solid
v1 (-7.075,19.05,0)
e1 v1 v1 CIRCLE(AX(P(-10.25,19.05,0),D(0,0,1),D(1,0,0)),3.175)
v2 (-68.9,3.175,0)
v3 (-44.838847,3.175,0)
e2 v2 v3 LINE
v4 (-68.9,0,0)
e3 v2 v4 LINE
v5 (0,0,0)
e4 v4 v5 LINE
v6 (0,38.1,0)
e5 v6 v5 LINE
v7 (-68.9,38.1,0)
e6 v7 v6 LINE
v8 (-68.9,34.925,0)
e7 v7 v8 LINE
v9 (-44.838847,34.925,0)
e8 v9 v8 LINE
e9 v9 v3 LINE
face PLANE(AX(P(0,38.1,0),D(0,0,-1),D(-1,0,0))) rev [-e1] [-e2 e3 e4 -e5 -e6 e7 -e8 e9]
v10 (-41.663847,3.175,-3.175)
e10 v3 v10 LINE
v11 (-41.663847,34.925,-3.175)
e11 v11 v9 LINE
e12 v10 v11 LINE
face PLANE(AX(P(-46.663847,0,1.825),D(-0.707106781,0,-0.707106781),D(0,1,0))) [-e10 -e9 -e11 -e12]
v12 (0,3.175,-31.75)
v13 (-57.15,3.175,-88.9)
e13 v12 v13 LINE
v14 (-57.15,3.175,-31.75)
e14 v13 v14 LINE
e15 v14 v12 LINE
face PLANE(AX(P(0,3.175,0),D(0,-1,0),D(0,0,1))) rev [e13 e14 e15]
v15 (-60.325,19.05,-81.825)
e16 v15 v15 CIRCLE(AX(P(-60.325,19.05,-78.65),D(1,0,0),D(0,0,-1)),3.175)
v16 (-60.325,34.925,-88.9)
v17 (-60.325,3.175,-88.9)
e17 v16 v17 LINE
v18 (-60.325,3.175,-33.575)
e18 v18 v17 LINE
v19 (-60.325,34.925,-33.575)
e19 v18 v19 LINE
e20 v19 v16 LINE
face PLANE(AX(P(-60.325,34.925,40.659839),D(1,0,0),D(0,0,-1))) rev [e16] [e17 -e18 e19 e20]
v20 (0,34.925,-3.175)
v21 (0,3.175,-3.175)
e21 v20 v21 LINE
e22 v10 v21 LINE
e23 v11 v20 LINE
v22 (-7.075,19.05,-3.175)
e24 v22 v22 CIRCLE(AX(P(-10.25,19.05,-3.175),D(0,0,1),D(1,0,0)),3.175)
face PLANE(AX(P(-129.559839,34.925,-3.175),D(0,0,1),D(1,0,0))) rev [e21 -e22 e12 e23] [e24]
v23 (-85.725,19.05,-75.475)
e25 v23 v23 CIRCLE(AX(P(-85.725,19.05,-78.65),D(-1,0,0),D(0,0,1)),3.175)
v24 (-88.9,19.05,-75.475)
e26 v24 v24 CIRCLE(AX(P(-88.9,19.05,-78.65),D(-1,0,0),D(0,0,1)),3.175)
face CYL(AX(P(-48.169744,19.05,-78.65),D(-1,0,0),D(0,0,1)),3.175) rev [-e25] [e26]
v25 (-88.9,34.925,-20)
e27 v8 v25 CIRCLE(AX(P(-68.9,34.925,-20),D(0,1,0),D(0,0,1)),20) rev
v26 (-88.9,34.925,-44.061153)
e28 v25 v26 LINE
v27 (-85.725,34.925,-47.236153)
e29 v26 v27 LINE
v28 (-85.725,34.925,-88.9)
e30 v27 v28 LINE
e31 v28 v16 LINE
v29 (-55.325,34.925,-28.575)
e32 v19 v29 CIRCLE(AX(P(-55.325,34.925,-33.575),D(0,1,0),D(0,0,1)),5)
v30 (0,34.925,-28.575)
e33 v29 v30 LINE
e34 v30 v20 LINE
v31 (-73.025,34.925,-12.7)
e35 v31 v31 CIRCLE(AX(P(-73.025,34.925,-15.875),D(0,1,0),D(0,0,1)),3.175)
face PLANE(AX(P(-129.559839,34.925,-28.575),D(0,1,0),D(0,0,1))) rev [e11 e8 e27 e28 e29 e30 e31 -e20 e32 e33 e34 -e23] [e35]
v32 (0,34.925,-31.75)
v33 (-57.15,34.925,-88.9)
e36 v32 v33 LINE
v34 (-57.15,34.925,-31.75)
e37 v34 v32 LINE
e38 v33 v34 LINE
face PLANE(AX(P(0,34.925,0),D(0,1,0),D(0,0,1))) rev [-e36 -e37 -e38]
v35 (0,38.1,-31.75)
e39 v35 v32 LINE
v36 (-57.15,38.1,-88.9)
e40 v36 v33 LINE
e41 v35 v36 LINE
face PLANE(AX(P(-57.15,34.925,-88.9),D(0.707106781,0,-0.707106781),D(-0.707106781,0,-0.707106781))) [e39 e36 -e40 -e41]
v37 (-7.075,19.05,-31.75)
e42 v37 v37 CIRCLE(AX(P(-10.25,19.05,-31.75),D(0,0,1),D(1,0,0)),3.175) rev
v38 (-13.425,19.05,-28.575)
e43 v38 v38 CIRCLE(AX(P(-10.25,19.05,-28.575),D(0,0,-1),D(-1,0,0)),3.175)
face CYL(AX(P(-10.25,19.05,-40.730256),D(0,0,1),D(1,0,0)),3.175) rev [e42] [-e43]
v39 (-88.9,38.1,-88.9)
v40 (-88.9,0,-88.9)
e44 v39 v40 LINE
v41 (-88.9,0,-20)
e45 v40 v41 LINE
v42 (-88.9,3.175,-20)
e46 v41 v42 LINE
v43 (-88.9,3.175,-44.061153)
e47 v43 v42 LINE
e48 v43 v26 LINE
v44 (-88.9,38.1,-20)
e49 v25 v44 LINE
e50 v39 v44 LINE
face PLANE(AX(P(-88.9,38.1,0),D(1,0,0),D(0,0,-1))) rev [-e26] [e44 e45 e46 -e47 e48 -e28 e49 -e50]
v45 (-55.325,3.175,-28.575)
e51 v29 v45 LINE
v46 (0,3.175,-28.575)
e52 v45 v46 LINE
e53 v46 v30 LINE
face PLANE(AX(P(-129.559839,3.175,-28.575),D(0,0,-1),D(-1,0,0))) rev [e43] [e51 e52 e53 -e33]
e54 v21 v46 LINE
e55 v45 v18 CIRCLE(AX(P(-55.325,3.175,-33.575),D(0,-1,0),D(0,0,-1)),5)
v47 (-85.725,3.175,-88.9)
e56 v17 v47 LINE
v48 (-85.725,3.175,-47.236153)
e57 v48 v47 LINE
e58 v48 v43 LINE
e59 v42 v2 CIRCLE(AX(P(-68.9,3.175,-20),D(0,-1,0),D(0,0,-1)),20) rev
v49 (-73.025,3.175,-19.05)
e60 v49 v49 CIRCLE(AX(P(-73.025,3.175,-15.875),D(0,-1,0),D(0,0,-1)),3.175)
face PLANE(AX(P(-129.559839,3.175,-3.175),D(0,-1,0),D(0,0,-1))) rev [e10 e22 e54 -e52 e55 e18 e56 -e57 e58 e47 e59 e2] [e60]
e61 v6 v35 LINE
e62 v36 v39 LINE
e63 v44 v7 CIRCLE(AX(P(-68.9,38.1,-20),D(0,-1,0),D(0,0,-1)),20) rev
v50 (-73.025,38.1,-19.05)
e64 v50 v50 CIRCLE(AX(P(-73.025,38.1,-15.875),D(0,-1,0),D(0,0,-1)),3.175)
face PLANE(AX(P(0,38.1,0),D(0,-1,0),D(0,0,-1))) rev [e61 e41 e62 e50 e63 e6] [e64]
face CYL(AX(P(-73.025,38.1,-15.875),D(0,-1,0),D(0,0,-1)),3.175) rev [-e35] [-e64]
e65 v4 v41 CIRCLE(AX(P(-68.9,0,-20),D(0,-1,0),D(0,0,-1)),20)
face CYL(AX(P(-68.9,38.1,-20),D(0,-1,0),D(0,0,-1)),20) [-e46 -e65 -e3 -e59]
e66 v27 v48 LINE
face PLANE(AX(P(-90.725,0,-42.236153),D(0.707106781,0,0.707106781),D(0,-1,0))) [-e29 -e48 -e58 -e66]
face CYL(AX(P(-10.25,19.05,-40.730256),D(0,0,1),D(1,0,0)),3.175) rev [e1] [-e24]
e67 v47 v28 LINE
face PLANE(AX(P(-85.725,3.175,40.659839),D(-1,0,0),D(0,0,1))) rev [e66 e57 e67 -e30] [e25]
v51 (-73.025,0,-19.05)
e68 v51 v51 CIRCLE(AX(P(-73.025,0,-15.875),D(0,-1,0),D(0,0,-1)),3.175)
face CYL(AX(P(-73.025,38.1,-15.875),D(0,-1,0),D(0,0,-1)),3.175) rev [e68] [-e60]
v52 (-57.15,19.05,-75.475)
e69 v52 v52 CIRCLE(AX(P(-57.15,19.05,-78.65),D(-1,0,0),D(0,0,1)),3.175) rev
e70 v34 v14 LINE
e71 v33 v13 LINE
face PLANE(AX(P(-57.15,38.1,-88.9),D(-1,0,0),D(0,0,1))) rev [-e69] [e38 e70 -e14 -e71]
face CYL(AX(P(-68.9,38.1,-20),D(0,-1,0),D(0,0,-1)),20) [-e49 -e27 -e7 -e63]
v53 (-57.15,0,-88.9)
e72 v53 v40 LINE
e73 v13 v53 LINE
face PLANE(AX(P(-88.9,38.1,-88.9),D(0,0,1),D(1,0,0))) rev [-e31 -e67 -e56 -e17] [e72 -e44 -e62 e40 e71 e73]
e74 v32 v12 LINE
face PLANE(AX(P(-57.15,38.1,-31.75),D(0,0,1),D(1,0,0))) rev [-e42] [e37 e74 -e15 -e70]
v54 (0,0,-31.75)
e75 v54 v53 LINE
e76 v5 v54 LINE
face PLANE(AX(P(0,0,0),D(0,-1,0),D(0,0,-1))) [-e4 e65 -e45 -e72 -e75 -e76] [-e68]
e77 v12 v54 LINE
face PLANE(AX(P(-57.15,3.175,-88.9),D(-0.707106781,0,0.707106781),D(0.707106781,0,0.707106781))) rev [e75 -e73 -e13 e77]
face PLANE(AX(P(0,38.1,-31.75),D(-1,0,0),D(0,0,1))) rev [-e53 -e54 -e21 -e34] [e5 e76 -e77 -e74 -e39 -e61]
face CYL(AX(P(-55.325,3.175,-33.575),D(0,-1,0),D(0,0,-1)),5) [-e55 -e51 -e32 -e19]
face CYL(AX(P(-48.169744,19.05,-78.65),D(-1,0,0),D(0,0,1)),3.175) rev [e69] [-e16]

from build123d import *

# Parameters (mm, degrees)
BOSS_EXTRUDE1_DEPTH     = 38.1
SKETCH2_W               = 25.4
SKETCH2_H               = 31.75
CUT_EXTRUDE1_DEPTH      = 88.9
CUT_EXTRUDE2_REACH      = 133.37
SKETCH3_W               = 25.4
SKETCH3_H               = 31.75
CUT_EXTRUDE3_START      = -62.861793
SKETCH4_W               = 75
SKETCH4_H               = 31.75
CUT_EXTRUDE3_DEPTH      = 28.575
FILLET4_R               = 20
CUT_EXTRUDE8_DEPTH      = 131.484388453
CUT_EXTRUDE8_DEPTH_BACK = 131.484388453
SKETCH8_R               = 3.175
BOSS_EXTRUDE2_DEPTH     = 3.175
CUT_EXTRUDE10_REACH     = 133.37
SKETCH35_R              = 3.175
CUT_EXTRUDE11_REACH     = 133.37
SKETCH36_R              = 3.175
FILLET8_R               = 5
CHAMFER1_SIZE           = 10
CHAMFER1_SIZE_2         = 7.071067812


with BuildPart() as part:
    # Sketch1 → Boss-Extrude1 (new body)
    with BuildSketch(Plane(origin=(0, 0, 0), x_dir=(1, 0, 0), z_dir=(0, 1, 0))):
        Polygon((0, 0), (-88.9, 0), (-88.9, 88.9), (-57.15, 88.9), (-57.15, 31.75), (0, 31.75), align=None)
    extrude(amount=BOSS_EXTRUDE1_DEPTH)

    # Sketch2 → Cut-Extrude1 (cut)
    with BuildSketch(Plane(origin=(0, 0, 0), x_dir=(0, 0, -1), z_dir=(1, 0, 0))):
        with Locations((15.875, 19.05)):
            Rectangle(SKETCH2_W, SKETCH2_H)
    extrude(amount=-CUT_EXTRUDE1_DEPTH, mode=Mode.SUBTRACT)

    # Cut-Extrude2: up to this face of the body (flat: up to its plane)
    cut_extrude2_end = Plane(part.part.faces().sort_by_distance((-44.45, 19.05, 0))[0])
    # Sketch3 → Cut-Extrude2 (cut, up to the picked face)
    with BuildSketch(Plane(origin=(0, 0, -88.9), x_dir=(-1, 0, 0), z_dir=(0, 0, -1)), mode=Mode.PRIVATE) as cut_extrude2_sk1:
        with Locations((73.025, 19.05)):
            Rectangle(SKETCH3_W, SKETCH3_H)
    cut_extrude2_tool1 = split(extrude(cut_extrude2_sk1.sketch, amount=-CUT_EXTRUDE2_REACH, mode=Mode.PRIVATE), bisect_by=cut_extrude2_end, keep=Keep.BOTH, mode=Mode.PRIVATE)
    add(cut_extrude2_tool1.solids().sort_by(Axis((-73.025, 19.05, -88.9), (0, 0, 1)))[0], mode=Mode.SUBTRACT)

    # Sketch4 → Cut-Extrude3 (cut)
    with BuildSketch(Plane(origin=(0, 0, 0), x_dir=(-0.7071067811865475, 0, -0.7071067811865476), z_dir=(0.7071067811865476, 0, -0.7071067811865475)).offset(CUT_EXTRUDE3_START)):
        with Locations((62.861792847, 19.05)):
            Rectangle(SKETCH4_W, SKETCH4_H)
    extrude(amount=CUT_EXTRUDE3_DEPTH, mode=Mode.SUBTRACT)

    # Fillet4
    fillet4_edges = [part.edges().sort_by_distance(p)[0] for p in [
        (-88.9, 36.5125, 0),
        (-88.9, 1.5875, 0),
    ]]
    fillet(fillet4_edges, radius=FILLET4_R)

    # Sketch8 → Cut-Extrude8 (cut, two sides: drawn at the far end of the back side and taken through both)
    with BuildSketch(Plane.XZ.offset(-34.925).offset(-CUT_EXTRUDE8_DEPTH_BACK)):
        with Locations(Location((-73.025, -15.875, 0), (0, 0, 270))):
            Circle(SKETCH8_R)
    extrude(amount=CUT_EXTRUDE8_DEPTH + CUT_EXTRUDE8_DEPTH_BACK, mode=Mode.SUBTRACT)

    # Sketch29 → Boss-Extrude2 (add)
    with BuildSketch(Plane(origin=(0, 38.1, 0), x_dir=(1, 0, 0), z_dir=(0, 1, 0))):
        Polygon((-57.15, 88.9), (0, 31.75), (-57.15, 31.75), align=None)
    boss_extrude2 = extrude(amount=-BOSS_EXTRUDE2_DEPTH)

    # Cut-Extrude10: up to this face of the body (flat: up to its plane)
    cut_extrude10_end = Plane(part.part.faces().sort_by_distance((-57.15, 17.4625, -60.325))[0])
    # Sketch35 → Cut-Extrude10 (cut, up to the picked face)
    with BuildSketch(Plane.ZY.offset(88.9), mode=Mode.PRIVATE) as cut_extrude10_sk1:
        with Locations((-78.65, 19.05)):
            Circle(SKETCH35_R)
    cut_extrude10_tool1 = split(extrude(cut_extrude10_sk1.sketch, amount=-CUT_EXTRUDE10_REACH, mode=Mode.PRIVATE), bisect_by=cut_extrude10_end, keep=Keep.BOTH, mode=Mode.PRIVATE)
    add(cut_extrude10_tool1.solids().sort_by(Axis((-88.9, 19.05, -78.65), (1, 0, 0)))[0], mode=Mode.SUBTRACT)

    # Cut-Extrude11: up to this face of the body (flat: up to its plane)
    cut_extrude11_end = Plane(part.part.faces().sort_by_distance((-28.575, 17.4625, -31.75))[0])
    # Sketch36 → Cut-Extrude11 (cut, up to the picked face)
    with BuildSketch(Plane.XY, mode=Mode.PRIVATE) as cut_extrude11_sk1:
        with Locations((-10.25, 19.05)):
            Circle(SKETCH36_R)
    cut_extrude11_tool1 = split(extrude(cut_extrude11_sk1.sketch, amount=-CUT_EXTRUDE11_REACH, mode=Mode.PRIVATE), bisect_by=cut_extrude11_end, keep=Keep.BOTH, mode=Mode.PRIVATE)
    add(cut_extrude11_tool1.solids().sort_by(Axis((-10.25, 19.05, 0), (0, 0, -1)))[0], mode=Mode.SUBTRACT)

    # Mirror1: Boss-Extrude2 across plane
    add(boss_extrude2.mirror(Plane(origin=(0, 19.05, 0), x_dir=(0, 0, 1), z_dir=(0, -1, 0))))

    # Fillet8
    fillet8_edges = [part.edges().sort_by_distance(p)[0] for p in [
        (-60.325, 19.05, -28.575),
    ]]
    fillet(fillet8_edges, radius=FILLET8_R)

    # Chamfer1
    # the kernel refuses this chamfer: 10, 7.071067812 mm, written as the material it takes off along each edge
    with BuildSketch(Plane(origin=(-51.663847671, 3.175, -3.175), x_dir=(0.9996219169112968, 0, -0.027495876610586317), z_dir=(0, 1, 0)), Plane(origin=(-85.725, 34.925, -37.236152329), x_dir=(0.027495876610586317, 0, -0.9996219169112968), z_dir=(0, -1, 0))) as chamfer1_piece_1:
        Polygon((CHAMFER1_SIZE * 0.999621916911, -CHAMFER1_SIZE * 0.0274958766106), (CHAMFER1_SIZE_2 * 0.687396915252, -CHAMFER1_SIZE_2 * 0.726281956863), (0, 0), align=None)
    extrude(amount=31.75, mode=Mode.SUBTRACT)


solid = part.part
